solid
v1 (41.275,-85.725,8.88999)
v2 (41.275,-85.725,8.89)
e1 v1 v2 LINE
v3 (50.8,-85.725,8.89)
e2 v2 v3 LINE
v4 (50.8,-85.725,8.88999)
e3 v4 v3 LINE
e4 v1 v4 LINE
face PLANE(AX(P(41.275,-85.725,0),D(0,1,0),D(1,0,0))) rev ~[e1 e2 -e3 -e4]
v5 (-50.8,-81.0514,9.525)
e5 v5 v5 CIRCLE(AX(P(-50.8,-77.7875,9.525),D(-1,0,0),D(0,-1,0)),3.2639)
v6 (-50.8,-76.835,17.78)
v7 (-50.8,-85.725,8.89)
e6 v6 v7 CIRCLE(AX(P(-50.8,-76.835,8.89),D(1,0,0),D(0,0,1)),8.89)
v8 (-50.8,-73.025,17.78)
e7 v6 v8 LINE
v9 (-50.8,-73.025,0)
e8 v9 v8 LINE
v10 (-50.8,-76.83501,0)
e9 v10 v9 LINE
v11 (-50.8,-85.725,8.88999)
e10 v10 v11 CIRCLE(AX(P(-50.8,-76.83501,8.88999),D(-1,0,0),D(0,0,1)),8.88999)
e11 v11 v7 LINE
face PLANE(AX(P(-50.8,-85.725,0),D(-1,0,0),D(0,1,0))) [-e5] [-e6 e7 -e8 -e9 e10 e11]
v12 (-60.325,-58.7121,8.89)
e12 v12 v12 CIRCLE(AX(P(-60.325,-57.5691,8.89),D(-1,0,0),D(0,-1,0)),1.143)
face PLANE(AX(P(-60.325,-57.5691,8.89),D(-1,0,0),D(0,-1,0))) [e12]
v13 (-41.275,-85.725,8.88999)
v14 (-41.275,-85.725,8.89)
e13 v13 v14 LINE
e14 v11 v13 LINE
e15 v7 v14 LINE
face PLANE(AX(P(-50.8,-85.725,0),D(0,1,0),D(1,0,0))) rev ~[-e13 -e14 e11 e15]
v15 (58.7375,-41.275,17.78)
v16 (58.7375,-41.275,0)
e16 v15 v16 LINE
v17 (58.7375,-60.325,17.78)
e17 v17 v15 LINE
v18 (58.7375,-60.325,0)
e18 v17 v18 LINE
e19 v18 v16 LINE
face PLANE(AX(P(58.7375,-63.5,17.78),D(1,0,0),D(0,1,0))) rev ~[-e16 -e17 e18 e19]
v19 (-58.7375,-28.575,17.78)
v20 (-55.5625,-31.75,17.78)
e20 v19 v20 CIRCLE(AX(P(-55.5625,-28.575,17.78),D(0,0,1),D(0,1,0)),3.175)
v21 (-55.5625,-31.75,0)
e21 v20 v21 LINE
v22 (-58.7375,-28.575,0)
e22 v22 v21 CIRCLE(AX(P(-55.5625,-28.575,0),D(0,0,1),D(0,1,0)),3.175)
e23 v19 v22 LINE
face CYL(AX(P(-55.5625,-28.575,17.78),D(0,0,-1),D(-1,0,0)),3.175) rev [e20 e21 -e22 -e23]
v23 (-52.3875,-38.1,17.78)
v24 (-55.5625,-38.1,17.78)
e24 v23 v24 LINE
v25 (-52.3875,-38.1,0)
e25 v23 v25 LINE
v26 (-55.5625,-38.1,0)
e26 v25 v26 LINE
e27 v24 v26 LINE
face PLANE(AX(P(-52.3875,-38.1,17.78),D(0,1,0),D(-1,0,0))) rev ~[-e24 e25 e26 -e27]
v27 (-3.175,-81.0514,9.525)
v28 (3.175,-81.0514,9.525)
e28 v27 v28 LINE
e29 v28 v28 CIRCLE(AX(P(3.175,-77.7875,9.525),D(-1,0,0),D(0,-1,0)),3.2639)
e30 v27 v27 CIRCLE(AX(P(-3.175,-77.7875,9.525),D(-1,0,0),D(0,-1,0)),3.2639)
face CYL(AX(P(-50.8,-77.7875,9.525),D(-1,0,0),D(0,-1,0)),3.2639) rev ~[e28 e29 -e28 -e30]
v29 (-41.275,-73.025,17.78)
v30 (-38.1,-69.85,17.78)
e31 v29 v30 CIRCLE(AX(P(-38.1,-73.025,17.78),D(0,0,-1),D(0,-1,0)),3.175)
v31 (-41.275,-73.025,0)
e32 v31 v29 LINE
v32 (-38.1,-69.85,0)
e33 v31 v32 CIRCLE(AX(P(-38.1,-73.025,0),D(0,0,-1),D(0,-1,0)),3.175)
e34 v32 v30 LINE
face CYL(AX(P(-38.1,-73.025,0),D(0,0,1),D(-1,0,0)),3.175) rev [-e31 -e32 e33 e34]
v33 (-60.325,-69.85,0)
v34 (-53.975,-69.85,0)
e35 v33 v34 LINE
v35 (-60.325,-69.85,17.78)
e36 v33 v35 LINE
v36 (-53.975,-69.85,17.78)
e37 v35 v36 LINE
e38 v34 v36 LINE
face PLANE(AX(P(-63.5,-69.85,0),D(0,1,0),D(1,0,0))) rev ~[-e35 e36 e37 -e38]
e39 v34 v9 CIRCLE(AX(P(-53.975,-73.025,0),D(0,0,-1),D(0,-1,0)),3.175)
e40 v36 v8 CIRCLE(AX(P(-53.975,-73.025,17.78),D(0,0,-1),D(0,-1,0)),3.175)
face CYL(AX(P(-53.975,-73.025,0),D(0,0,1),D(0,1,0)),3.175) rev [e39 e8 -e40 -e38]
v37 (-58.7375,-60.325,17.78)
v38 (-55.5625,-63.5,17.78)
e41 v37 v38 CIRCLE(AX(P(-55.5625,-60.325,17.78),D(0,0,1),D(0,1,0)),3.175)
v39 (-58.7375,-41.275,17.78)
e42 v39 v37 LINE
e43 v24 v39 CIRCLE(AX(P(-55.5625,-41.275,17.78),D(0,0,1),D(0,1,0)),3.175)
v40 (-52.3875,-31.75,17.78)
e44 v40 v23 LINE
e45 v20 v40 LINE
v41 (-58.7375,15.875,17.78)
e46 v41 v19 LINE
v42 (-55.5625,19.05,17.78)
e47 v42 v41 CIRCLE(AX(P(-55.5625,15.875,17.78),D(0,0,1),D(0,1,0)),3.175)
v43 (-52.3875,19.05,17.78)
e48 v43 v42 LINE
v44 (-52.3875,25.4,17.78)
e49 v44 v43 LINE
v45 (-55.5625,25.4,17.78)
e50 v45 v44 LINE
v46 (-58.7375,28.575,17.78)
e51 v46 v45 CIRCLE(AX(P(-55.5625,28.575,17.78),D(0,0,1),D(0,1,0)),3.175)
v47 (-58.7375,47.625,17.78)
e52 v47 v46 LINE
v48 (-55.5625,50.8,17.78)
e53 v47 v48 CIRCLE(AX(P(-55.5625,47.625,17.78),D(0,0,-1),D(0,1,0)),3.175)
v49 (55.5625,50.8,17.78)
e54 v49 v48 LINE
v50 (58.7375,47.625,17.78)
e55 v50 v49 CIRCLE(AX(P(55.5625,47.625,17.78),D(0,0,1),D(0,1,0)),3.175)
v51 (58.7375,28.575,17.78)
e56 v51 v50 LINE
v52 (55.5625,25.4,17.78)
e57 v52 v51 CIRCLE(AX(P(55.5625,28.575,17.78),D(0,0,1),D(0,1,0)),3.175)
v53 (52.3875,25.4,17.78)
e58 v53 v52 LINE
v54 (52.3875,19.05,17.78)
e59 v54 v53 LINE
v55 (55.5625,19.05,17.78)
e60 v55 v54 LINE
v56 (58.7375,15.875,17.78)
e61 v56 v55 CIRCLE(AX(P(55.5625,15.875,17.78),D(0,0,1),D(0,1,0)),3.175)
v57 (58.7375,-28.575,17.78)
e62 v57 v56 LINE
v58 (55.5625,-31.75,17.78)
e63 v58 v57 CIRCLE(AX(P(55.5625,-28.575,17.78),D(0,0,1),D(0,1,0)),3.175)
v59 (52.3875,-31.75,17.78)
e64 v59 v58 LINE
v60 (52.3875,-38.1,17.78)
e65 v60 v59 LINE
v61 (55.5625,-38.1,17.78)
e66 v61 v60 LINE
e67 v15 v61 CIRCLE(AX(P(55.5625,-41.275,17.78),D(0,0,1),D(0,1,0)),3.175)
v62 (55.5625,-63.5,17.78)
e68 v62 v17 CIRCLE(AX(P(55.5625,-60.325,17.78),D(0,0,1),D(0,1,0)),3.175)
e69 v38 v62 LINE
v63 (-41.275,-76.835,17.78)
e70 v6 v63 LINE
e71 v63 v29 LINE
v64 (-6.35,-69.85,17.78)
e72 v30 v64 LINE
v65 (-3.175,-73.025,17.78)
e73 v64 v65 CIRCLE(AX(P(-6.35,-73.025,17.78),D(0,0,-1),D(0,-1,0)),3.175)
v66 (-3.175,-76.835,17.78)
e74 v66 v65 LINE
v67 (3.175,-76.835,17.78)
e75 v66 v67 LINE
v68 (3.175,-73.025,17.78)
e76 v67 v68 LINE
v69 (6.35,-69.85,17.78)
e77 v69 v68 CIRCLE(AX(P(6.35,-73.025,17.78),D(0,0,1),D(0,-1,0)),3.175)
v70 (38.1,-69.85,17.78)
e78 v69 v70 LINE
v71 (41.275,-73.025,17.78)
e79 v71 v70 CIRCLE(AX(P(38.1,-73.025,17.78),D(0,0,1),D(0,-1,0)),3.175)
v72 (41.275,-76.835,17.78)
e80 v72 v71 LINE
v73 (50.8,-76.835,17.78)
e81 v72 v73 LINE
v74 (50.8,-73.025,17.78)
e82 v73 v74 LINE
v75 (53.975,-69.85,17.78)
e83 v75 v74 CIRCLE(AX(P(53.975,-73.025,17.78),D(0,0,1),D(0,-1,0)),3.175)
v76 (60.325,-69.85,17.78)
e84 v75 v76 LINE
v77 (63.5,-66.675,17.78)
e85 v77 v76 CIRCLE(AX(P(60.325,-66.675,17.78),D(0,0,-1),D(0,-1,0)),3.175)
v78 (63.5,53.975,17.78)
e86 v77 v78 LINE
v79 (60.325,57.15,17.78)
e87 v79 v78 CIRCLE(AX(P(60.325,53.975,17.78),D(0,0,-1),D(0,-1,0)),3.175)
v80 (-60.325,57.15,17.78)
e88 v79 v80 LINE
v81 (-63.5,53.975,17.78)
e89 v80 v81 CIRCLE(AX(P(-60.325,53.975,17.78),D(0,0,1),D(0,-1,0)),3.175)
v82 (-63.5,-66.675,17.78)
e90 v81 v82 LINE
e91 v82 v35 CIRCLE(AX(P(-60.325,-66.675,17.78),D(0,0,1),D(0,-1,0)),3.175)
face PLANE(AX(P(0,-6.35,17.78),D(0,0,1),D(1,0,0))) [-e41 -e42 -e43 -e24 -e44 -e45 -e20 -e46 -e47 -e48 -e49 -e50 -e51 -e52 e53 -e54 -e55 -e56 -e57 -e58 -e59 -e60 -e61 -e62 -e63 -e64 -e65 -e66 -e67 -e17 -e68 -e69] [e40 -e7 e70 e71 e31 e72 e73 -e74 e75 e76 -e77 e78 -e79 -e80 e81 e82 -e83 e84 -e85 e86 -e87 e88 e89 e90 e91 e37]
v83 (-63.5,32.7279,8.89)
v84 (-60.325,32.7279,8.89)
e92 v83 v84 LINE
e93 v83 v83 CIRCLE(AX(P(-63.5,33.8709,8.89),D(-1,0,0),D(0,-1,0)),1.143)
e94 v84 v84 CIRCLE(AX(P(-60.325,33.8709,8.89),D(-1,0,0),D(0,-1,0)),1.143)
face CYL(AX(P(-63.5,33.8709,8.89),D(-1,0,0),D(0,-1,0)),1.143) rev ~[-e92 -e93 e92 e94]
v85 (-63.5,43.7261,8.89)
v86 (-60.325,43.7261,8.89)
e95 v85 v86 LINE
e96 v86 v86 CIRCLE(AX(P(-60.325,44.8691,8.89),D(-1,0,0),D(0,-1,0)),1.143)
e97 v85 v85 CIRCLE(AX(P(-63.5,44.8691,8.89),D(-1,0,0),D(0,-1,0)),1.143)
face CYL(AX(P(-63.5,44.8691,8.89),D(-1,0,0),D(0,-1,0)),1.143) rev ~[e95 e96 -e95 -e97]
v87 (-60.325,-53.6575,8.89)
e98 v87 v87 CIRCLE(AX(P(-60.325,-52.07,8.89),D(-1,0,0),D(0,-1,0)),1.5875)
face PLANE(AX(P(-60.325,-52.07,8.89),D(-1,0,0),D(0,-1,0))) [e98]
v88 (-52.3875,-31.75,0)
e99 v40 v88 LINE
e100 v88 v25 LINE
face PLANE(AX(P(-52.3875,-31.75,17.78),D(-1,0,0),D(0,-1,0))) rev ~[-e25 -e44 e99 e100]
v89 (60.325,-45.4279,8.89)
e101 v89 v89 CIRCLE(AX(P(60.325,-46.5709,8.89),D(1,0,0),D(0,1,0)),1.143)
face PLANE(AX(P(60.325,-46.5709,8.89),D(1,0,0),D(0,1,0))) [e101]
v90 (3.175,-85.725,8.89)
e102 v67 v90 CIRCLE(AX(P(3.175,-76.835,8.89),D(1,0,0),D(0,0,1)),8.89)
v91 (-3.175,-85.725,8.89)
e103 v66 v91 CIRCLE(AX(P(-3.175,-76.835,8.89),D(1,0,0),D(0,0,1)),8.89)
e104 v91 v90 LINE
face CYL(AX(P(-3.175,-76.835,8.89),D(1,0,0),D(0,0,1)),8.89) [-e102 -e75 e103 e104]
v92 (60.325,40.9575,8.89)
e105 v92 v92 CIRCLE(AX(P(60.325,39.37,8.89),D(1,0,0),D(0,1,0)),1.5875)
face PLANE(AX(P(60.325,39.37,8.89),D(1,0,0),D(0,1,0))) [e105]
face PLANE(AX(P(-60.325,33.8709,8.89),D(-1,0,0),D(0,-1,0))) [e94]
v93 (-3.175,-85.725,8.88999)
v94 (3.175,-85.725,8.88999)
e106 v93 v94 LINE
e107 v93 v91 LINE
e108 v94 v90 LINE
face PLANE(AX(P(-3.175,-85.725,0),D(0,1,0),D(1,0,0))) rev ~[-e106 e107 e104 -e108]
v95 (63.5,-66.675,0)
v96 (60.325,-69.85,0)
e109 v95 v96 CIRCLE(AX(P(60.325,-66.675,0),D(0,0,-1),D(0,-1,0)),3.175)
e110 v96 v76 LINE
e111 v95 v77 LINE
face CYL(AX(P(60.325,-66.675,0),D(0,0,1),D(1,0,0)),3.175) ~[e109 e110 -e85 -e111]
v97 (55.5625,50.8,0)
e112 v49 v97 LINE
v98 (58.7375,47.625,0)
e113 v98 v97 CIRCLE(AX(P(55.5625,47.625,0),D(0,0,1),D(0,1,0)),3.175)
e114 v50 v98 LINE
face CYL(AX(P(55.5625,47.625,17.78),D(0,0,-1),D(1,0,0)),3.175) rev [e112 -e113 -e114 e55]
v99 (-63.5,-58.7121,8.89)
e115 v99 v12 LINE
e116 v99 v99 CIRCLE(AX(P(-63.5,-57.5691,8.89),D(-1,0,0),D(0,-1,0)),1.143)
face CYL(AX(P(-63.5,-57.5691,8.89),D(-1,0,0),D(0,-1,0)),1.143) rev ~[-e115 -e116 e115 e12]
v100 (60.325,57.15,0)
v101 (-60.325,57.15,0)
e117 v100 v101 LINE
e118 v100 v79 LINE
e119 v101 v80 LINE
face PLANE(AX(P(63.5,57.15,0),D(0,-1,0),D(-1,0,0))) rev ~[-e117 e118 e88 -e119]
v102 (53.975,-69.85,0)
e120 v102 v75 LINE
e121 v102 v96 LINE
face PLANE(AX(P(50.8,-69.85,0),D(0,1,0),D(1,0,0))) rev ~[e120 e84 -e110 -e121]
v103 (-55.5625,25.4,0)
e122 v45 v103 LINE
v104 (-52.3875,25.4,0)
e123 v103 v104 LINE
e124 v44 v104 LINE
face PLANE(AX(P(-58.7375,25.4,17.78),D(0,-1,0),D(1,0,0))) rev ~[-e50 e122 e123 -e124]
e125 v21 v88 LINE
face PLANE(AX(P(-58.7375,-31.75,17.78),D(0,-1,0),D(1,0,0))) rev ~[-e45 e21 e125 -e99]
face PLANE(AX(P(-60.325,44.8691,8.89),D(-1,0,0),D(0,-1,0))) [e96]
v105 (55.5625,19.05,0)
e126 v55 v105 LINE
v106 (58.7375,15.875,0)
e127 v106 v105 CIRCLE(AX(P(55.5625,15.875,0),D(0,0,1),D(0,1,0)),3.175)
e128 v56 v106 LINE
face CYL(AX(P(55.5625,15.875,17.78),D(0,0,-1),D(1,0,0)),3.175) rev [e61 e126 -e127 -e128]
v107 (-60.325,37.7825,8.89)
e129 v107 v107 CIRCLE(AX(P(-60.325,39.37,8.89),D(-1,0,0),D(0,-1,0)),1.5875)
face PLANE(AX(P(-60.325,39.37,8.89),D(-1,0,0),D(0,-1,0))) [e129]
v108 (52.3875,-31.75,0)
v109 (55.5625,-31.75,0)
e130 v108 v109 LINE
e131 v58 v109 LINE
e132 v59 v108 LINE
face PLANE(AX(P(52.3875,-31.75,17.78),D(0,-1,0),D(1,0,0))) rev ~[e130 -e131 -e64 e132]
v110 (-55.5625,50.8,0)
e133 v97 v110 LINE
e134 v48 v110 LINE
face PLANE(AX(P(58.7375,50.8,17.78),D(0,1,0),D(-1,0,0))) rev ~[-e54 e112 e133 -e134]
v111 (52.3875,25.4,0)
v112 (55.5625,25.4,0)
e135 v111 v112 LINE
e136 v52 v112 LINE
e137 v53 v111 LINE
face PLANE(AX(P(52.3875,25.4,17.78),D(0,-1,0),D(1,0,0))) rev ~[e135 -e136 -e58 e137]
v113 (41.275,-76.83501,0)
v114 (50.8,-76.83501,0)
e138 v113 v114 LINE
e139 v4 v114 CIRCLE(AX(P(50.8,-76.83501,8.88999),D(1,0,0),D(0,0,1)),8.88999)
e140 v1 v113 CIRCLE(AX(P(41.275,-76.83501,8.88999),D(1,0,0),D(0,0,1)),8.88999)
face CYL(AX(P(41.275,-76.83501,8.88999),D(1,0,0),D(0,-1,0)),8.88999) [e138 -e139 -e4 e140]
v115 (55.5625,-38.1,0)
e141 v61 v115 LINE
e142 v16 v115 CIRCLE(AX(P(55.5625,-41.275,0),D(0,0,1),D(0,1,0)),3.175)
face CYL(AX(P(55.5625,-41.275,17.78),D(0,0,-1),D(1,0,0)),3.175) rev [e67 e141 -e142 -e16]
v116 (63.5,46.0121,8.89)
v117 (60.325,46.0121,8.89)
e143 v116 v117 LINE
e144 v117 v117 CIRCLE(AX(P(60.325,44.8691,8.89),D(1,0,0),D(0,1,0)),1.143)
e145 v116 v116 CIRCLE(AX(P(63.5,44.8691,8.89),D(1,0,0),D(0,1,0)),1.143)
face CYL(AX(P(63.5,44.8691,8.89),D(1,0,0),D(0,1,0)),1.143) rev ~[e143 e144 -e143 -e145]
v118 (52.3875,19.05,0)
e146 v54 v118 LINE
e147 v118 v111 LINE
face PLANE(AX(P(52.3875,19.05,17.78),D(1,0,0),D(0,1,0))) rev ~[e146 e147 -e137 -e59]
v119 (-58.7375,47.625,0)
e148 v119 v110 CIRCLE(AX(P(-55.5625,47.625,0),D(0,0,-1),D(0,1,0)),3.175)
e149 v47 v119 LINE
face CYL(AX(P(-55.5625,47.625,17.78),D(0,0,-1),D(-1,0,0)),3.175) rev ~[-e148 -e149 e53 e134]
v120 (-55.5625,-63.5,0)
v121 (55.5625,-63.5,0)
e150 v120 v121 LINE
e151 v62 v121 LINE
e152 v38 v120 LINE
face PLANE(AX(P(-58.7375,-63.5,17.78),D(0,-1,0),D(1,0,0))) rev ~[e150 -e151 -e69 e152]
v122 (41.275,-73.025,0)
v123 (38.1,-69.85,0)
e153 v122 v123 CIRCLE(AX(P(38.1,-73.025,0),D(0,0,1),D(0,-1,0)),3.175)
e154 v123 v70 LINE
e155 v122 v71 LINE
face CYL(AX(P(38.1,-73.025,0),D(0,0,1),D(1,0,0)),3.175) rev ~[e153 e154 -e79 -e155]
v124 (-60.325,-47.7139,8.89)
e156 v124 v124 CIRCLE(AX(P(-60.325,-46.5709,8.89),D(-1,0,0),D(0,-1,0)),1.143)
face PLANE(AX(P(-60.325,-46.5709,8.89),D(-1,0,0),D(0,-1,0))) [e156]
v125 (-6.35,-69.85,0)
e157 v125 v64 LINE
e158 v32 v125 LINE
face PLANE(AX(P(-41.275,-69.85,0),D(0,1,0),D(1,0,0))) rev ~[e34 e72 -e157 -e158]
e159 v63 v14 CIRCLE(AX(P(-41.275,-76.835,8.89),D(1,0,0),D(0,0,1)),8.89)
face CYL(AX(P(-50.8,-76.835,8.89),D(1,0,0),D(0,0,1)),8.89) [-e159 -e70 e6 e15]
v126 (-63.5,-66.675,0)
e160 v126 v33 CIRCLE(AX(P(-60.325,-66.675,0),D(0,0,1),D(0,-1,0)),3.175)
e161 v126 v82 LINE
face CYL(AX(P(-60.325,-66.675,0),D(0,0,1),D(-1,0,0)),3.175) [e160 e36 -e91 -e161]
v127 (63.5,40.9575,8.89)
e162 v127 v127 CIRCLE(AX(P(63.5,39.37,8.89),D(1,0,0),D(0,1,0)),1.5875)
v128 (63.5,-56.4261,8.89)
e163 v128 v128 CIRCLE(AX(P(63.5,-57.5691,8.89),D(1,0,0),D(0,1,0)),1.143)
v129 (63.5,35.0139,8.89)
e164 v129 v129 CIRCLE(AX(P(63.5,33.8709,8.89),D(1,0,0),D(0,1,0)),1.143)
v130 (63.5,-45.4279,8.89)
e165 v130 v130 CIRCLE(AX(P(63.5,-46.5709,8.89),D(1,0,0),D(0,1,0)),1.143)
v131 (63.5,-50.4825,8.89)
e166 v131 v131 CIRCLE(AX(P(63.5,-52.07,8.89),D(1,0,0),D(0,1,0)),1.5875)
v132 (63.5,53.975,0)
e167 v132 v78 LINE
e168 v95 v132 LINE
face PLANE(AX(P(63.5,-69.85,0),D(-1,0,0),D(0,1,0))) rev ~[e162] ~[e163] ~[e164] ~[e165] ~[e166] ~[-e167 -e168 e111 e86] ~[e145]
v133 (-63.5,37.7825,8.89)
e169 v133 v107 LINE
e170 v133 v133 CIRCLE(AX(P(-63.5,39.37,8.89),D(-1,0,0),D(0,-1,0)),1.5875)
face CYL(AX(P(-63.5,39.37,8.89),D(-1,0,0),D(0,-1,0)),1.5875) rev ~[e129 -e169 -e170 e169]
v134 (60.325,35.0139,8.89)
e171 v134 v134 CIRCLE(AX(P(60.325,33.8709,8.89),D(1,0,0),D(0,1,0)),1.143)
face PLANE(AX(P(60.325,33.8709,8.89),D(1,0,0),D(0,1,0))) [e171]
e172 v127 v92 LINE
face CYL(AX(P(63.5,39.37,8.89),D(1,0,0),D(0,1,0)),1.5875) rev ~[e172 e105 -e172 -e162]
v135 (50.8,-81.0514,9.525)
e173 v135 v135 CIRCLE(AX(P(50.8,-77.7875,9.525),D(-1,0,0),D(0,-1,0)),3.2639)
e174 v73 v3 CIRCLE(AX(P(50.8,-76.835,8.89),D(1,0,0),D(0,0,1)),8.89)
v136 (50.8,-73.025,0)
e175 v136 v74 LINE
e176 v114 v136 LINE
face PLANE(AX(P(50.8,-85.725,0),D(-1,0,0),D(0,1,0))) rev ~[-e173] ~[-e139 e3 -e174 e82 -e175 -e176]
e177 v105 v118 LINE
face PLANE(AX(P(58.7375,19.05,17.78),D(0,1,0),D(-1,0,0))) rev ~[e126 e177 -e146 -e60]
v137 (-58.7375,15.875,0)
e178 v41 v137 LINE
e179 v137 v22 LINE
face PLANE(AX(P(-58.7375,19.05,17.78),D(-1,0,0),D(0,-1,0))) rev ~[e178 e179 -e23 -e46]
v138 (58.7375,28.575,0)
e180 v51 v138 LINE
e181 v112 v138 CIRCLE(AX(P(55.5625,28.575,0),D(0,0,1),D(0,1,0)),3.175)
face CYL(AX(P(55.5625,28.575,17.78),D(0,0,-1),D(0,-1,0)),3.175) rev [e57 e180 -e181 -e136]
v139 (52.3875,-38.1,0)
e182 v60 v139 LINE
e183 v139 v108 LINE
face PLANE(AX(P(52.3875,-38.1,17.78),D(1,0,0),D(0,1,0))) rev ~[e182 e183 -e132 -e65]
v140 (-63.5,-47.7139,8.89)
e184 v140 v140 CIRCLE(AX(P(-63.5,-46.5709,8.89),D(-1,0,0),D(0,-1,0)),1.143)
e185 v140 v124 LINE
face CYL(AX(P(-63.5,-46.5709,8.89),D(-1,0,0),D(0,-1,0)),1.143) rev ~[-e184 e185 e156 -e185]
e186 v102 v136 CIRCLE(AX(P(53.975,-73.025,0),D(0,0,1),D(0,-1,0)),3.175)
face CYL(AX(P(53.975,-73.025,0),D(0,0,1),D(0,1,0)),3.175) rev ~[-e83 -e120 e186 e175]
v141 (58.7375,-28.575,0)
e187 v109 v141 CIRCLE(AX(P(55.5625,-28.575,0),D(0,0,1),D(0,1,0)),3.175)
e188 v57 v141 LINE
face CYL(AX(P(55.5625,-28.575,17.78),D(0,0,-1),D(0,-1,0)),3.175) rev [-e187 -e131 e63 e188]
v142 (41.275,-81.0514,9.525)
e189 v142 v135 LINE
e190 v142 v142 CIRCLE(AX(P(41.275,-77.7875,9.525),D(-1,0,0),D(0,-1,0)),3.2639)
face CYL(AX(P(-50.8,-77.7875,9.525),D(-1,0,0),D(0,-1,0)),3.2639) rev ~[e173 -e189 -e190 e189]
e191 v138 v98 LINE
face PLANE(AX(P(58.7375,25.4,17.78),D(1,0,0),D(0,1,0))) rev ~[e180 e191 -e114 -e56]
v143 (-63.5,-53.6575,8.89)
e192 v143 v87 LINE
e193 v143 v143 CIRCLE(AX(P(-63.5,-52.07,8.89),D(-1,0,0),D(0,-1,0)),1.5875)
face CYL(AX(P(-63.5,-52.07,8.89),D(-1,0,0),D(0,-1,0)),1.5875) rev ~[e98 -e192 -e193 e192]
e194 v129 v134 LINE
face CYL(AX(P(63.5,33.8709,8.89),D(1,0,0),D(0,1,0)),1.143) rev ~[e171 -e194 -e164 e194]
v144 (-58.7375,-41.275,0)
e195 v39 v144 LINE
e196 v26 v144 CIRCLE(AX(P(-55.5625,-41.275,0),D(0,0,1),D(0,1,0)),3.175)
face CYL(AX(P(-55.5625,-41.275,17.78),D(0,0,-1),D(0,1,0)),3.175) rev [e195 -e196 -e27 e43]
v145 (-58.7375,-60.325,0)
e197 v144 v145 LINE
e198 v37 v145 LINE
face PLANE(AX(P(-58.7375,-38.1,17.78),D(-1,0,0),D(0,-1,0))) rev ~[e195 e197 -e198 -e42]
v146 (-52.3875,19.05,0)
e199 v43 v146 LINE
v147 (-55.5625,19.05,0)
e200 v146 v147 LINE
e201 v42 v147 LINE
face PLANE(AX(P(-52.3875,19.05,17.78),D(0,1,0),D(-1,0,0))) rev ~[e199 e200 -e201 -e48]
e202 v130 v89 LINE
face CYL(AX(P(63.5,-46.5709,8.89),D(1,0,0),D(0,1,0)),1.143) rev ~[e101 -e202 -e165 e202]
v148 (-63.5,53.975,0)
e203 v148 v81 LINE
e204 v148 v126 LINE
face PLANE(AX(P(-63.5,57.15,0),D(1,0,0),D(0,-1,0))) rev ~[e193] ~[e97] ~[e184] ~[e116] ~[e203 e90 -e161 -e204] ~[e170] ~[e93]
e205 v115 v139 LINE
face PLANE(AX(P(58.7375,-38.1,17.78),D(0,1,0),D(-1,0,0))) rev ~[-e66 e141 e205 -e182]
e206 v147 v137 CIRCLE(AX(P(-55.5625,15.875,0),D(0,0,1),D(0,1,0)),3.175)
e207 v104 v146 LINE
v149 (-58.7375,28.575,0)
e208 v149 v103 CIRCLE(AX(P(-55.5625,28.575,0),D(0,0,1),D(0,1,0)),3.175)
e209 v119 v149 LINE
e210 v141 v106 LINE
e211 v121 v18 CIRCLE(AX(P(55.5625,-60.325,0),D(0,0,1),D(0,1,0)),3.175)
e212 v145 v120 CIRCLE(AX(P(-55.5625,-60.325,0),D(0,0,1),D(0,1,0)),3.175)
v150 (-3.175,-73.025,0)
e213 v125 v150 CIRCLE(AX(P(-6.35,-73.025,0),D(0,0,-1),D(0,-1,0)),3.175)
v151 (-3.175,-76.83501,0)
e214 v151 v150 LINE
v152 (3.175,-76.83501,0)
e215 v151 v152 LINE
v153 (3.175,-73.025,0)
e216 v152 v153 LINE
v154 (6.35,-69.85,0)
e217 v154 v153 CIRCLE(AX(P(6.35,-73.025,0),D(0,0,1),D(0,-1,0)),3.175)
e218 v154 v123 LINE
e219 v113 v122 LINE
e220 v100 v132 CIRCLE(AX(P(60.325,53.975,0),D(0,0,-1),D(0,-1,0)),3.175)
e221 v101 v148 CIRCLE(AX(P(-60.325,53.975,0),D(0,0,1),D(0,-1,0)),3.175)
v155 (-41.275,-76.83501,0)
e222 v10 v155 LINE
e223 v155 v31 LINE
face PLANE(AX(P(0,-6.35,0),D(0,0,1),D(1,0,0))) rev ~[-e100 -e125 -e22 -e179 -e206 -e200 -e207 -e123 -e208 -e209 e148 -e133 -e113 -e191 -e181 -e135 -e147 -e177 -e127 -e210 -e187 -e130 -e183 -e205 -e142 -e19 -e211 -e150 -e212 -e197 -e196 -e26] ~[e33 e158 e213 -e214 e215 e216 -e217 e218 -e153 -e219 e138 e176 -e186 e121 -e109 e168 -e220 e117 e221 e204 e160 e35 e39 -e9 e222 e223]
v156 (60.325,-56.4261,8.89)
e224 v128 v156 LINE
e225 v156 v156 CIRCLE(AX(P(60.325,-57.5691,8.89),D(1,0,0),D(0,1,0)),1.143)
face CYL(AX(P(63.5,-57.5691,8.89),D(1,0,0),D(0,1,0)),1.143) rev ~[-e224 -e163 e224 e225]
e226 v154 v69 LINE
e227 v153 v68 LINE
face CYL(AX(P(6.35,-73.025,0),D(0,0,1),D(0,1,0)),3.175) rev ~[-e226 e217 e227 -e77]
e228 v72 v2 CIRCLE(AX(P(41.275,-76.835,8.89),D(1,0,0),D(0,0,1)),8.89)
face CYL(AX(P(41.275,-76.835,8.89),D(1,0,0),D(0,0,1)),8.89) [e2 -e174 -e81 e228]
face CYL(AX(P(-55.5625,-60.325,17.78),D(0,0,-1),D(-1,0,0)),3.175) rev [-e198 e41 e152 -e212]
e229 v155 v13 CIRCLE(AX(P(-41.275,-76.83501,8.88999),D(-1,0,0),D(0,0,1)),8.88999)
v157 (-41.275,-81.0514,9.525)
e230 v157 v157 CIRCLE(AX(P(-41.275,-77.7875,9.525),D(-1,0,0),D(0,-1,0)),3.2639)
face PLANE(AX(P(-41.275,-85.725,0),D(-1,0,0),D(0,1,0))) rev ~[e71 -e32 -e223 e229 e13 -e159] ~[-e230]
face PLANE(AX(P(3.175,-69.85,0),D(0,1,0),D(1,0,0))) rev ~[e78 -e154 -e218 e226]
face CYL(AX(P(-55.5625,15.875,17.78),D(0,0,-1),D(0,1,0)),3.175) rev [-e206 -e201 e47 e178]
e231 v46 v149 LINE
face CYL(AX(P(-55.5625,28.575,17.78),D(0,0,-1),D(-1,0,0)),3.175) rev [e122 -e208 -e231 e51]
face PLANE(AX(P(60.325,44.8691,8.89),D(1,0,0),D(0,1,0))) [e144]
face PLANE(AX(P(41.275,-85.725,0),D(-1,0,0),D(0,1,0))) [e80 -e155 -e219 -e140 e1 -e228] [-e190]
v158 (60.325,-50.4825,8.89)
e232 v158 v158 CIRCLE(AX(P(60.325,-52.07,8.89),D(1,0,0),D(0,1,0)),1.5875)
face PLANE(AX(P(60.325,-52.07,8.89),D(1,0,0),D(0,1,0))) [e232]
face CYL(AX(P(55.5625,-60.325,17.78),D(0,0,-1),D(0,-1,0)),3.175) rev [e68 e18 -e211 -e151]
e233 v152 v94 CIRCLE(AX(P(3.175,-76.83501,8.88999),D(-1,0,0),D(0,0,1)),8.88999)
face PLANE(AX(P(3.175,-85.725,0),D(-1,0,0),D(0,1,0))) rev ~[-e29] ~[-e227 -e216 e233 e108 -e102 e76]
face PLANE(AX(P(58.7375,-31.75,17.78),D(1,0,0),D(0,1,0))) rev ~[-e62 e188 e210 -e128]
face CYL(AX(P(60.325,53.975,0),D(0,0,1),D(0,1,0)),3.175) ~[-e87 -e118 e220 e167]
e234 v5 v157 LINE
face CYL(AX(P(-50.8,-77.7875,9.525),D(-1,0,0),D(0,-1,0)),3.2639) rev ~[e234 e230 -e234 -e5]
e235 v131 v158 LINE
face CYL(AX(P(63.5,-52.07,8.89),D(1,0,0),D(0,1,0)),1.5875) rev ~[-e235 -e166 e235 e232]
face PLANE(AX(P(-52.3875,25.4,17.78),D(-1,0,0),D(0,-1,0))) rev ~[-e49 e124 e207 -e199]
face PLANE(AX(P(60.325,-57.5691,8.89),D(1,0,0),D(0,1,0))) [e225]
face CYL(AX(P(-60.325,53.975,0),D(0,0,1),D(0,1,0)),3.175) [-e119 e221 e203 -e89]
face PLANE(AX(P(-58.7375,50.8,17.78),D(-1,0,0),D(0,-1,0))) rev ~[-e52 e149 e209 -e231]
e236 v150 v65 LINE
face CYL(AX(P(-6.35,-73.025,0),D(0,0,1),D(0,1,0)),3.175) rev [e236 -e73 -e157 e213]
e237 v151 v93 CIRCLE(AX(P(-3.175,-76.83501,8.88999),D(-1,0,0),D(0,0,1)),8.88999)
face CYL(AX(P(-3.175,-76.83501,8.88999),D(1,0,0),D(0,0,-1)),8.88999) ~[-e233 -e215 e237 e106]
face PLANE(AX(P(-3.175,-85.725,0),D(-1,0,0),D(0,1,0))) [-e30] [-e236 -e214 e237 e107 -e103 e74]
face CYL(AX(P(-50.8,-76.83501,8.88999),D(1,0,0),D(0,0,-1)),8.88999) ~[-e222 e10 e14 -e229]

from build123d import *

# Parameters (mm, degrees)
F0_W      = 9.525
F0_H      = 15.875
F0_W_2    = 6.35
F1_DEPTH  = 17.78
F3_DEPTH  = 17.781
F4_R      = 3.175
F7_R      = 3.2639
F8_DEPTH  = 114.301
F9_R      = 8.89
F10_R     = 8.88999
F11_R     = 1.5875
F11_R_2   = 1.143
F12_DEPTH = 3.175
F15_R     = 1.5875
F15_R_2   = 1.143
F16_DEPTH = 3.175


# Not quite as in the source:
# - two fillets or chamfers of one size are made in one step
# - a fillet or chamfer is up to 0.001 mm smaller than in the source, because OpenCascade refuses the exact size


with BuildPart() as f1:
    # F0 (on Top) → F1 (new body)
    with BuildSketch(Plane.XY):
        Polygon((63.5, 57.15), (-63.5, 57.15), (-63.5, -69.85), (-50.8, -69.85), (-41.275, -69.85), (-3.175, -69.85), (3.175, -69.85), (41.275, -69.85), (50.8, -69.85), (63.5, -69.85), align=None)
        with Locations((-46.0375, -77.7875)):
            Rectangle(F0_W, F0_H)
        with Locations((46.0375, -77.7875)):
            Rectangle(F0_W, F0_H)
        with Locations((0, -77.7875)):
            Rectangle(F0_W_2, F0_H)
    extrude(amount=F1_DEPTH)

    # F2 (on face) → F3 (cut, through all)
    with BuildSketch(Plane.XY.offset(17.78)):
        Polygon((3.175, 50.8), (-58.7375, 50.8), (-58.7375, 25.4), (-52.3875, 25.4), (-52.3875, 19.05), (-58.7375, 19.05), (-58.7375, -31.75), (-52.3875, -31.75), (-52.3875, -38.1), (-58.7375, -38.1), (-58.7375, -63.5), (3.175, -63.5), (58.7375, -63.5), (58.7375, -38.1), (52.3875, -38.1), (52.3875, -31.75), (58.7375, -31.75), (58.7375, 19.05), (52.3875, 19.05), (52.3875, 25.4), (58.7375, 25.4), (58.7375, 50.8), align=None)
    extrude(amount=-F3_DEPTH, mode=Mode.SUBTRACT)

    # F4
    f4_edges = [f1.edges().sort_by_distance(p)[0] for p in [
        (-58.7375, 50.8, 8.89),
        (63.5, 57.15, 8.89),
        (-63.5, 57.15, 8.89),
        (63.5, -69.85, 8.89),
        (-63.5, -69.85, 8.89),
        (50.8, -69.85, 8.89),
        (-50.8, -69.85, 8.89),
        (41.275, -69.85, 8.89),
        (-41.275, -69.85, 8.89),
        (3.175, -69.85, 8.89),
        (-3.175, -69.85, 8.89),
        (58.7375, 25.4, 8.89),
        (58.7375, 50.8, 8.89),
        (-58.7375, 25.4, 8.89),
        (-58.7375, 19.05, 8.89),
        (-58.7375, -31.75, 8.89),
        (-58.7375, -38.1, 8.89),
        (-58.7375, -63.5, 8.89),
        (58.7375, -63.5, 8.89),
        (58.7375, -38.1, 8.89),
        (58.7375, -31.75, 8.89),
        (58.7375, 19.05, 8.89),
    ]]
    fillet(f4_edges, radius=F4_R)

    # F7 (on face) → F8 (cut, through all)
    with BuildSketch(Plane(origin=(-50.8, 0, 0), x_dir=(0, -1, 0), z_dir=(-1, 0, 0))):
        with Locations((77.7875, 9.525)):
            Circle(F7_R)
    extrude(amount=-F8_DEPTH, mode=Mode.SUBTRACT)

    # F9
    f9_edges = [f1.edges().sort_by_distance(p)[0] for p in [
        (-46.0375, -85.725, 17.78),
        (0, -85.725, 17.78),
        (46.0375, -85.725, 17.78),
    ]]
    fillet(f9_edges, radius=F9_R)

    # F10 (radius 8.89 in the source; OpenCascade refuses exactly that, so slightly less here)
    f10_edges = [f1.edges().sort_by_distance(p)[0] for p in [
        (-46.0375, -85.725, 0),
        (0, -85.725, 0),
        (46.0375, -85.725, 0),
    ]]
    fillet(f10_edges, radius=F10_R)

    # F11 (on face) → F12 (cut)
    with BuildSketch(Plane.YZ.offset(63.5)):
        with Locations((-52.07, 8.89)):
            Circle(F11_R)
        with Locations((-46.5709, 8.89)):
            Circle(F11_R_2)
        with Locations((39.37, 8.89)):
            Circle(F11_R)
        with Locations((33.8709, 8.89)):
            Circle(F11_R_2)
        with Locations((-57.5691, 8.89)):
            Circle(F11_R_2)
        with Locations((44.8691, 8.89)):
            Circle(F11_R_2)
    extrude(amount=-F12_DEPTH, mode=Mode.SUBTRACT)

    # F15 (on face) → F16 (cut)
    with BuildSketch(Plane(origin=(-63.5, 0, 0), x_dir=(0, -1, 0), z_dir=(-1, 0, 0))):
        with Locations((-39.37, 8.89)):
            Circle(F15_R)
        with Locations((-33.8709, 8.89)):
            Circle(F15_R_2)
        with Locations((-44.8691, 8.89)):
            Circle(F15_R_2)
        with Locations((52.07, 8.89)):
            Circle(F15_R)
        with Locations((57.5691, 8.89)):
            Circle(F15_R_2)
        with Locations((46.5709, 8.89)):
            Circle(F15_R_2)
    extrude(amount=-F16_DEPTH, mode=Mode.SUBTRACT)


solid = f1.part
